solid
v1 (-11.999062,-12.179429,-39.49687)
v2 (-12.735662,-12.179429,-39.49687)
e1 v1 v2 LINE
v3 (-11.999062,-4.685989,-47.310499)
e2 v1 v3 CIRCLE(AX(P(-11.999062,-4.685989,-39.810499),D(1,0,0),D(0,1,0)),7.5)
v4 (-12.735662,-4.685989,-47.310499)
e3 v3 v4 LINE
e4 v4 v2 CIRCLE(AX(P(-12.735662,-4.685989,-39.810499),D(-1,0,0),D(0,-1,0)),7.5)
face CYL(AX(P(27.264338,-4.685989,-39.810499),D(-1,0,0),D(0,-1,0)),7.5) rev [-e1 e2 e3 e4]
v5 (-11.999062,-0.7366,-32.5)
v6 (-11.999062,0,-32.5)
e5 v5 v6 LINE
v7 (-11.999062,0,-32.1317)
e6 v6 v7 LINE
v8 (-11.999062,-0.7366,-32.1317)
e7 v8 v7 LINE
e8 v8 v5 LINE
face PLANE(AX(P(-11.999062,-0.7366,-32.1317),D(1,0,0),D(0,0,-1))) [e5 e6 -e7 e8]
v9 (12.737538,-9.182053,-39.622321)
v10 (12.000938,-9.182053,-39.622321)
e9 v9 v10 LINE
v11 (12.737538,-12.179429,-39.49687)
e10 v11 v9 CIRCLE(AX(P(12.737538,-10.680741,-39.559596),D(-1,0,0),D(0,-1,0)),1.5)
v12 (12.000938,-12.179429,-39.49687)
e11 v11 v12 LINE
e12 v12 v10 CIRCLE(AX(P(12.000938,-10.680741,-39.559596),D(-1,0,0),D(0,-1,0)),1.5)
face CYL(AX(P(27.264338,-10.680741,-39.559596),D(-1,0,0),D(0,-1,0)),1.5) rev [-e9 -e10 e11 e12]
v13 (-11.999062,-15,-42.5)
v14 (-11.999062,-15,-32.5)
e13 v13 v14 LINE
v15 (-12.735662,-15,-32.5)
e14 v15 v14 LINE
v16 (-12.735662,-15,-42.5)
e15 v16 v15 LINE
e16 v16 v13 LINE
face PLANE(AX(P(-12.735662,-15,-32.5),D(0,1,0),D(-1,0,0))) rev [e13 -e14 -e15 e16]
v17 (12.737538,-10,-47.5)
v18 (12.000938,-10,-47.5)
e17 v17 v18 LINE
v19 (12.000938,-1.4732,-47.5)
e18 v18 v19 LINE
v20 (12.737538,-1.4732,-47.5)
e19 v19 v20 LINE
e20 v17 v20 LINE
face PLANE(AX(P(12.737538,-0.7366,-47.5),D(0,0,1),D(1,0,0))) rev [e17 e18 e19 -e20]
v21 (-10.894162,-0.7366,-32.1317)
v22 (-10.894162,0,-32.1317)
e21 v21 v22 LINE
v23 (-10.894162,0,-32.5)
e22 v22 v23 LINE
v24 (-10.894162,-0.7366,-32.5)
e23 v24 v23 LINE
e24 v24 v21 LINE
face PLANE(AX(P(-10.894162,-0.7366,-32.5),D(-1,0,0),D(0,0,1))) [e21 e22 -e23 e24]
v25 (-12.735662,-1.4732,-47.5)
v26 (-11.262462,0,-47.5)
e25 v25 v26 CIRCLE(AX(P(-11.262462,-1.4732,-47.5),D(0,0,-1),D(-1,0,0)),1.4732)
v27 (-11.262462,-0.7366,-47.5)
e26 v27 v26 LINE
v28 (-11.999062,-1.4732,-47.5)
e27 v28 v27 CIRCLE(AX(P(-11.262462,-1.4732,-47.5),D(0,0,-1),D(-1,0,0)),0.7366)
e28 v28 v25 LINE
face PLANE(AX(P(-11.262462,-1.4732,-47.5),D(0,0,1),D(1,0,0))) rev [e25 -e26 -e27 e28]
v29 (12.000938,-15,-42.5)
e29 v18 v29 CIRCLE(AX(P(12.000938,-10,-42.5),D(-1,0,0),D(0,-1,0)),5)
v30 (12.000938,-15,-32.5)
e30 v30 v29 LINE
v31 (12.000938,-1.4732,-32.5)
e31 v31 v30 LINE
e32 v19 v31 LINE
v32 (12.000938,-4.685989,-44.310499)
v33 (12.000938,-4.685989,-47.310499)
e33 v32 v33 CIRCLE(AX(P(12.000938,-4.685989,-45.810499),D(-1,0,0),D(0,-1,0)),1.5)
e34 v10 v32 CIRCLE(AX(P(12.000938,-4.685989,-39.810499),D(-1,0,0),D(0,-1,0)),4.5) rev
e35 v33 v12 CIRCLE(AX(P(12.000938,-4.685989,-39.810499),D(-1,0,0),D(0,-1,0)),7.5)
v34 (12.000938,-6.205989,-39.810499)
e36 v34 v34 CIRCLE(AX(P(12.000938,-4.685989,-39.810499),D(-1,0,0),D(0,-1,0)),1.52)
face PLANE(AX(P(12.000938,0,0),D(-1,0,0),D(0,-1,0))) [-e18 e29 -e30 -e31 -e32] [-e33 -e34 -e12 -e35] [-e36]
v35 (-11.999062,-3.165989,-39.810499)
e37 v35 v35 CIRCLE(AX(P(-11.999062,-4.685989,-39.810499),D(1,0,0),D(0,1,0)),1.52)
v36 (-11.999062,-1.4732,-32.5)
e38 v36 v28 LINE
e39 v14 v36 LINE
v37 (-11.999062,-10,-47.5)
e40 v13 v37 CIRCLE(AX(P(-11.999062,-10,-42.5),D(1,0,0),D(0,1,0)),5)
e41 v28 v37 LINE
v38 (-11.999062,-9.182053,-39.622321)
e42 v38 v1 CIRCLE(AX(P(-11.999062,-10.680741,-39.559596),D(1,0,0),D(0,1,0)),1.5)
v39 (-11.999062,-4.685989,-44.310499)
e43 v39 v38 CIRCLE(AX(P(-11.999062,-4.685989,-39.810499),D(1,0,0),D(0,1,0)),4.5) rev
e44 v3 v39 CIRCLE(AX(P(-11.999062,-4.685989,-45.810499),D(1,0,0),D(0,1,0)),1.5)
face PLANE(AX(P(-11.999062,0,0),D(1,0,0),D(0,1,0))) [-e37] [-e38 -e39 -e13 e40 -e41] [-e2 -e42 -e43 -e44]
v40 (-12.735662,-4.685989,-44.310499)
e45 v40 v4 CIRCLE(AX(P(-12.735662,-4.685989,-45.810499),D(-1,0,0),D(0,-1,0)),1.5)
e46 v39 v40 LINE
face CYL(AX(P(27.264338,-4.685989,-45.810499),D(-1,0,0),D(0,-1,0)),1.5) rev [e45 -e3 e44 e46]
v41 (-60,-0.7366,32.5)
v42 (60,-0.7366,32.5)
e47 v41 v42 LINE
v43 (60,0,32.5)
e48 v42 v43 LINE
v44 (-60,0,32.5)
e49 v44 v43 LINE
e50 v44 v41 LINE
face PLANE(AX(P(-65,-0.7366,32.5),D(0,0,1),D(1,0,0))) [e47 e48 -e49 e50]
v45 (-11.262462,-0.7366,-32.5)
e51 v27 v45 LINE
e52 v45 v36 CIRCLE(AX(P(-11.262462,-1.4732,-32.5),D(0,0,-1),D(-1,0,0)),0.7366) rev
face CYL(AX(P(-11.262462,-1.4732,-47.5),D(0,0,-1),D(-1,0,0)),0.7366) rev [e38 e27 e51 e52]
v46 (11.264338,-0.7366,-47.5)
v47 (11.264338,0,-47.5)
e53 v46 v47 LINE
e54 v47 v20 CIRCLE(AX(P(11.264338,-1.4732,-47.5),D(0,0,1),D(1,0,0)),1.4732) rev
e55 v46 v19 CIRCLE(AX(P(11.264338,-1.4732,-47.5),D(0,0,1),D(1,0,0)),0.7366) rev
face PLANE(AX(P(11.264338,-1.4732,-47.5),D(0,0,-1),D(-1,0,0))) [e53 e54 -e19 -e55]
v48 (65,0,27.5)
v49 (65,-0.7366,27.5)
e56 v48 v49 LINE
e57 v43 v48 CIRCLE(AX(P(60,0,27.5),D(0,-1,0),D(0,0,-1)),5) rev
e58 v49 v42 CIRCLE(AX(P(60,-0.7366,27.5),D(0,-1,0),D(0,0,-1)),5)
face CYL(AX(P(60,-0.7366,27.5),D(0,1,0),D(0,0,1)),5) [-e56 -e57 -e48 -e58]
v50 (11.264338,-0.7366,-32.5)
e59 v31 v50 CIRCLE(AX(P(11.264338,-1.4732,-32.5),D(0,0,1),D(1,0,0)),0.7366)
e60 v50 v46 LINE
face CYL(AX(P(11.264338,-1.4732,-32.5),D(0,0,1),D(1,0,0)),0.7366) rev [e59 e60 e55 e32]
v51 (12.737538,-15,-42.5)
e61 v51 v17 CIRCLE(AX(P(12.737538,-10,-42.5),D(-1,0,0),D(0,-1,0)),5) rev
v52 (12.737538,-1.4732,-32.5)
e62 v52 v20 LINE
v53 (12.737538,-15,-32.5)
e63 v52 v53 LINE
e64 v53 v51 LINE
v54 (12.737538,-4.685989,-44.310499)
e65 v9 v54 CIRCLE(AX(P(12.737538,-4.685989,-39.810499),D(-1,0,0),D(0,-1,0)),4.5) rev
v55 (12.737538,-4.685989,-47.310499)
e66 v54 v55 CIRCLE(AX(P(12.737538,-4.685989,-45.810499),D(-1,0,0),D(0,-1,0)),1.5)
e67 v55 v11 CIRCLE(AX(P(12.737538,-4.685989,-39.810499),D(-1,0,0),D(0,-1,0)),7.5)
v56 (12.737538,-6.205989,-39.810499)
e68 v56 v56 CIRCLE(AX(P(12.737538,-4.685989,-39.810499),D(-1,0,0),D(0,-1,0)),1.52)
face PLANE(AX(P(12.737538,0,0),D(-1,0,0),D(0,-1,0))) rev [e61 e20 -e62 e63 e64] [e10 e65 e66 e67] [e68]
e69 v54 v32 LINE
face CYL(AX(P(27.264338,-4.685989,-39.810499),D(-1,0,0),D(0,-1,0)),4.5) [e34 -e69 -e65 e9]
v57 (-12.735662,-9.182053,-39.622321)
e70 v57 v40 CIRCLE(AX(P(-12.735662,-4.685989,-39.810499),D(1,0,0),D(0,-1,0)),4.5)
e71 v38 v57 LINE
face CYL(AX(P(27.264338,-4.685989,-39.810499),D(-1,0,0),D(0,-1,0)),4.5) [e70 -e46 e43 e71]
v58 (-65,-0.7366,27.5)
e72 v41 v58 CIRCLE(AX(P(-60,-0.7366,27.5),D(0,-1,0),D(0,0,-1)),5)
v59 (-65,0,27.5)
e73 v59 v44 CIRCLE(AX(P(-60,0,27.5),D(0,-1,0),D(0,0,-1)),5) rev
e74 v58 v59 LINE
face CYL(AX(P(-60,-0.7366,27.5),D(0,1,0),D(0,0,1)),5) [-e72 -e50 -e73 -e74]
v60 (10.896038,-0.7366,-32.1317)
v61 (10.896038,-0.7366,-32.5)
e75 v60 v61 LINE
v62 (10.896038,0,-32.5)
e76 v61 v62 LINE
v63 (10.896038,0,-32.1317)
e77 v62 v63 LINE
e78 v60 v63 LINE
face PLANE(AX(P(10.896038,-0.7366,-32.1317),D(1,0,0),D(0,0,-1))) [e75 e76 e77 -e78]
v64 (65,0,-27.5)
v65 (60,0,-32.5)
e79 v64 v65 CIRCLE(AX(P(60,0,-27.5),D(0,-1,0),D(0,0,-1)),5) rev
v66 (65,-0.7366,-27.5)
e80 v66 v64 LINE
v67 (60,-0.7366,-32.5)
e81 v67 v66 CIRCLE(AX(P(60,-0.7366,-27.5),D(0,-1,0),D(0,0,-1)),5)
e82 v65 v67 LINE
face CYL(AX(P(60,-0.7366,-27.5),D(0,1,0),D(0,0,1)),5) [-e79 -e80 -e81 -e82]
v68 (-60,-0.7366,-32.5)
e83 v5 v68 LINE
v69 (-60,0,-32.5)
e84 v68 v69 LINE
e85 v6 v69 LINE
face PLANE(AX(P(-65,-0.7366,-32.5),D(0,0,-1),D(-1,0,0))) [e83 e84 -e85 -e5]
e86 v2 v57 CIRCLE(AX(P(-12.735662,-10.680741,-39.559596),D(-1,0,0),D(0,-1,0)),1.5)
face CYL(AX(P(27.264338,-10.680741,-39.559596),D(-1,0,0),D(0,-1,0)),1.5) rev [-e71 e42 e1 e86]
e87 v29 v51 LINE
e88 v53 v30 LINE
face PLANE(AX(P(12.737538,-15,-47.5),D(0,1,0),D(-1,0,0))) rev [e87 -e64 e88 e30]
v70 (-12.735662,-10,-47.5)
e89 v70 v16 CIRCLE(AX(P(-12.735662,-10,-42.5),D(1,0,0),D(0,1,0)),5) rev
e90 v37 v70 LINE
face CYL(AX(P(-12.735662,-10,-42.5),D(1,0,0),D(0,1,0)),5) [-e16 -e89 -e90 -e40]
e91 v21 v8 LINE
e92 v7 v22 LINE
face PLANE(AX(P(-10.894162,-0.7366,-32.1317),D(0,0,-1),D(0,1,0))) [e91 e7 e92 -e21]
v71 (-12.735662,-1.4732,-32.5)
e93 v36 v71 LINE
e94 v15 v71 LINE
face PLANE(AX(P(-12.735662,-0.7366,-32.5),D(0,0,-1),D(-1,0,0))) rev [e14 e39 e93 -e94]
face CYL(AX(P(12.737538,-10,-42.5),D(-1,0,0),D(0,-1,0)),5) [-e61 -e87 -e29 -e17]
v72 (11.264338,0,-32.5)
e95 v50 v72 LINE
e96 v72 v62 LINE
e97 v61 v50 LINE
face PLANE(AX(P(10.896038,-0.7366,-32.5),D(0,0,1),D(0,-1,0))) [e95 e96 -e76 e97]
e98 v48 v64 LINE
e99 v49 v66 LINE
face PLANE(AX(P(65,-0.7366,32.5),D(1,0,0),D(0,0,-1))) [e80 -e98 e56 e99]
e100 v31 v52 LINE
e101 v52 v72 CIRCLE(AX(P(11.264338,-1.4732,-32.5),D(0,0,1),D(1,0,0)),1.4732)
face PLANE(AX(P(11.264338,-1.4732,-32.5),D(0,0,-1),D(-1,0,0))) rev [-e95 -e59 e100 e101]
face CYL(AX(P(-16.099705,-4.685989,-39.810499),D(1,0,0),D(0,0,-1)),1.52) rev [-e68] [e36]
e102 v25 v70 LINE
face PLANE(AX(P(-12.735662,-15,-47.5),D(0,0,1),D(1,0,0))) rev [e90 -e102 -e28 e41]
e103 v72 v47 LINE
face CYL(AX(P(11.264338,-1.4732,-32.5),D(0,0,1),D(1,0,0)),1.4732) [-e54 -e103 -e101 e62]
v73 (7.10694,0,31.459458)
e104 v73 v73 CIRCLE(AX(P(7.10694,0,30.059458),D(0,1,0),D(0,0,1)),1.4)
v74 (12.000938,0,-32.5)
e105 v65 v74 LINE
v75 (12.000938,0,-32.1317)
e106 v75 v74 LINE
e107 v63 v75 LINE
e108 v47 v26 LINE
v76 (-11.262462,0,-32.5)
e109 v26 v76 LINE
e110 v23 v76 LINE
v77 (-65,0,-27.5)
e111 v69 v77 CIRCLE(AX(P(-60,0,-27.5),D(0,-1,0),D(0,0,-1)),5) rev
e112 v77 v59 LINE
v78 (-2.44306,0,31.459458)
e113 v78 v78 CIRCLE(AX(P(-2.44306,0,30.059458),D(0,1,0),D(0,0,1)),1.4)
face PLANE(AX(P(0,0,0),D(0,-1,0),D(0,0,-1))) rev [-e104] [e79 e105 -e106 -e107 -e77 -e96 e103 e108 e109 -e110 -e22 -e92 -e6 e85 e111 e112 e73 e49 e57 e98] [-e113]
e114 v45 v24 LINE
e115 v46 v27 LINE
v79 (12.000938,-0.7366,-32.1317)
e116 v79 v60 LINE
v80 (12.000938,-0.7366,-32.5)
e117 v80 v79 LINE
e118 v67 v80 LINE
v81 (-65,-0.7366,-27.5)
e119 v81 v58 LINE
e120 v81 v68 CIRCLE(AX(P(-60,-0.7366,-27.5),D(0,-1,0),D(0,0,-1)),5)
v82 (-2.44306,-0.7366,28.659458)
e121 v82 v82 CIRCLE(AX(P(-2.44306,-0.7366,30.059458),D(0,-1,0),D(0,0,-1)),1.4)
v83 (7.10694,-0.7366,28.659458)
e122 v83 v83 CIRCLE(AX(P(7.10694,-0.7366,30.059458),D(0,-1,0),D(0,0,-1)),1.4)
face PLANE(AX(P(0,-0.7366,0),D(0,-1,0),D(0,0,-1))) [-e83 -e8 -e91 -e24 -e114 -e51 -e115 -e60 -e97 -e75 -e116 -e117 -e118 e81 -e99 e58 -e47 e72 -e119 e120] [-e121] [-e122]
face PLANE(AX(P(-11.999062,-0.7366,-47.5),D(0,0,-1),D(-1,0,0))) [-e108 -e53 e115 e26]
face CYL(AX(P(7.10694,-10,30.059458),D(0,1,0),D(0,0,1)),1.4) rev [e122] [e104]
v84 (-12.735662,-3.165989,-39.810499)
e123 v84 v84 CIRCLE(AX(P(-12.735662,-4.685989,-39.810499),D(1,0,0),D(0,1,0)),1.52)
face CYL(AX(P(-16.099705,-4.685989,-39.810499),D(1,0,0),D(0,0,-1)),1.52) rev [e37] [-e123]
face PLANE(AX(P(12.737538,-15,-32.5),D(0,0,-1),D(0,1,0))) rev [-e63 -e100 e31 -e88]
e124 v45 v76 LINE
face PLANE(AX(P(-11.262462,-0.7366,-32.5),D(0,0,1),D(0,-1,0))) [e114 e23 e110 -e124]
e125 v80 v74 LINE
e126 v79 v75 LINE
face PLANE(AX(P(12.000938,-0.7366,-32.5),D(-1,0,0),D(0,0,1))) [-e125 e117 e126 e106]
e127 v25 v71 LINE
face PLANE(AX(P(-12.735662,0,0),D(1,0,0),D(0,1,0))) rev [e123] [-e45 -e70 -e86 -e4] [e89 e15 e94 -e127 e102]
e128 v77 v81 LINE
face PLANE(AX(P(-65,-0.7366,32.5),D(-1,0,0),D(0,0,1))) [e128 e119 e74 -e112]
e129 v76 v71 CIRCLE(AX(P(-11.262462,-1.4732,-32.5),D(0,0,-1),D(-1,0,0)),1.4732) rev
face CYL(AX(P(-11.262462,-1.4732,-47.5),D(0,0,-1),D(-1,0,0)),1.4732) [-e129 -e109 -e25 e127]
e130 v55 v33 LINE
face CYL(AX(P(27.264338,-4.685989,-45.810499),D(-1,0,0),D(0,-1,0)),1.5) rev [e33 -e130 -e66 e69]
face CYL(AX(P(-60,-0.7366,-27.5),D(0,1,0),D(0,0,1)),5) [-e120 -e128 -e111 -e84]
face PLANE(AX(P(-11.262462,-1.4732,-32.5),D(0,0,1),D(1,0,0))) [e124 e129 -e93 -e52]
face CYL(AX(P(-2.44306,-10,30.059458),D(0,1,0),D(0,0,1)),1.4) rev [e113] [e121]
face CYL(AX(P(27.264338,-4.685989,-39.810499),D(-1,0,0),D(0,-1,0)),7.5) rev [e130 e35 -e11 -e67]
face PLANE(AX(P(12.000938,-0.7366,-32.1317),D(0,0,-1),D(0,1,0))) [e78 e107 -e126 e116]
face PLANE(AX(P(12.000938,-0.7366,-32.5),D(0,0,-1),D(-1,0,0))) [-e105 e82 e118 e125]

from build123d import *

# Parameters (mm, degrees)
BASE_FLANGE1_DEPTH   = 0.7366
FILLET1_R            = 5
FILLET2_R            = 5
FILLET3_R            = 5
FILLET4_R            = 5
EDGE_FLANGE2_START   = -47.5
EDGE_FLANGE2_DEPTH   = 15.3683
EDGE_FLANGE2_START_2 = -32.5
EDGE_FLANGE2_2_DEPTH = 0.3683
EDGE_FLANGE2_3_DEPTH = 15
FILLET7_R            = 5
FILLET8_R            = 5
SKETCH18_R           = 1.5
CUT_EXTRUDE1_DEPTH   = 40
SKETCH23_R           = 1.52
CUT_EXTRUDE6_DEPTH   = 30
SKETCH25_R           = 1.4
CUT_EXTRUDE8_DEPTH   = 10


with BuildPart() as part:
    # Base-Flange1: sheet metal written as solids
    # Sketch1 → Base-Flange1 (new body)
    with BuildSketch(Plane(origin=(0, 0, 0), x_dir=(1, 0, 0), z_dir=(0, 1, 0))):
        Polygon((19.610938441, 32.5), (65, 32.5), (65, -32.5), (-65, -32.5), (-65, 32.5), (-19.610938441, 32.5), (-11.999061559, 32.5), (-11.999061559, 47.5), (12.000938441, 47.5), (12.000938441, 32.5), align=None)
    extrude(amount=-BASE_FLANGE1_DEPTH)

    # Fillet1
    fillet1_edges = [part.edges().sort_by_distance(p)[0] for p in [
        (65, -0.3683, 32.5),
    ]]
    fillet(fillet1_edges, radius=FILLET1_R)

    # Fillet2
    fillet2_edges = [part.edges().sort_by_distance(p)[0] for p in [
        (65, -0.3683, -32.5),
    ]]
    fillet(fillet2_edges, radius=FILLET2_R)

    # Fillet3
    fillet3_edges = [part.edges().sort_by_distance(p)[0] for p in [
        (-65, -0.3683, 32.5),
    ]]
    fillet(fillet3_edges, radius=FILLET3_R)

    # Fillet4
    fillet4_edges = [part.edges().sort_by_distance(p)[0] for p in [
        (-65, -0.3683, -32.5),
    ]]
    fillet(fillet4_edges, radius=FILLET4_R)

    # Edge-Flange2: read off the stored shape, not the designer's step
    # Edge-Flange2 outline → Edge-Flange2 (cut)
    with BuildSketch(Plane.XY.offset(EDGE_FLANGE2_START)):
        with BuildLine():
            ThreePointArc((-11.999061559, -0.197371375), (-11.643753776, -0.050198073), (-11.262461559, 0))
            Line((-11.262461559, 0), (-11.999061559, 0))
            Line((-11.999061559, 0), (-11.999061559, -0.197371375))
        make_face()
        with BuildLine():
            ThreePointArc((11.264338441, 0), (11.645630659, -0.050198073), (12.000938441, -0.197371375))
            Line((12.000938441, -0.197371375), (12.000938441, 0))
            Line((12.000938441, 0), (11.264338441, 0))
        make_face()
    extrude(amount=EDGE_FLANGE2_DEPTH, mode=Mode.SUBTRACT)

    # Edge-Flange2 2 outline → Edge-Flange2 2 (cut)
    with BuildSketch(Plane.XY.offset(EDGE_FLANGE2_START_2)):
        with BuildLine():
            Line((-11.999061559, -0.7366), (-10.894161559, -0.7366))
            Line((-10.894161559, -0.7366), (-10.894161559, 0))
            Line((-10.894161559, 0), (-11.262461559, 0))
            ThreePointArc((-11.262461559, 0), (-11.643753776, -0.050198073), (-11.999061559, -0.197371375))
            Line((-11.999061559, -0.197371375), (-11.999061559, -0.7366))
        make_face()
        with BuildLine():
            Line((12.000938441, -0.7366), (12.000938441, -0.197371375))
            ThreePointArc((12.000938441, -0.197371375), (11.645630659, -0.050198073), (11.264338441, 0))
            Line((11.264338441, 0), (10.896038441, 0))
            Line((10.896038441, 0), (10.896038441, -0.7366))
            Line((10.896038441, -0.7366), (12.000938441, -0.7366))
        make_face()
    extrude(amount=EDGE_FLANGE2_2_DEPTH, mode=Mode.SUBTRACT)

    # Edge-Flange2 3 outline → Edge-Flange2 3 (add)
    with BuildSketch(Plane.XY.offset(EDGE_FLANGE2_START)):
        with BuildLine():
            ThreePointArc((-11.999061559, -1.4732), (-11.783316414, -0.952345145), (-11.262461559, -0.7366))
            Line((-11.262461559, -0.7366), (-11.999061559, -0.7366))
            Line((-11.999061559, -0.7366), (-11.999061559, -0.197371375))
            ThreePointArc((-11.999061559, -0.197371375), (-12.538290183, -0.7366), (-12.735661559, -1.4732))
            Line((-12.735661559, -1.4732), (-12.735661559, -15))
            Line((-12.735661559, -15), (-11.999061559, -15))
            Line((-11.999061559, -15), (-11.999061559, -1.4732))
        make_face()
        with BuildLine():
            Line((12.737538441, -15), (12.737538441, -1.4732))
            ThreePointArc((12.737538441, -1.4732), (12.540167066, -0.7366), (12.000938441, -0.197371375))
            Line((12.000938441, -0.197371375), (12.000938441, -0.7366))
            Line((12.000938441, -0.7366), (11.264338441, -0.7366))
            ThreePointArc((11.264338441, -0.7366), (11.785193296, -0.952345145), (12.000938441, -1.4732))
            Line((12.000938441, -1.4732), (12.000938441, -15))
            Line((12.000938441, -15), (12.737538441, -15))
        make_face()
    extrude(amount=EDGE_FLANGE2_3_DEPTH)

    # Fillet7
    fillet7_edges = [part.edges().sort_by_distance(p)[0] for p in [
        (12.369238441, -15, -47.5),
    ]]
    fillet(fillet7_edges, radius=FILLET7_R)

    # Fillet8
    fillet8_edges = [part.edges().sort_by_distance(p)[0] for p in [
        (-12.367361559, -15, -47.5),
    ]]
    fillet(fillet8_edges, radius=FILLET8_R)

    # Sketch18 → Cut-Extrude1 (cut)
    with BuildSketch(Plane.ZY.offset(12.735661559)):
        with Locations(Location((-39.810498868, -4.68598948, 0), (0, 0, 270))):
            Circle(SKETCH18_R)
        with BuildLine():
            ThreePointArc((-39.496869826, -12.179429066), (-38.060907717, -10.61801534), (-39.622321443, -9.182053232))
            ThreePointArc((-39.622321443, -9.182053232), (-42.925238149, -7.933819403), (-44.310498868, -4.68598948))
            ThreePointArc((-44.310498868, -4.68598948), (-45.810498868, -3.18598948), (-47.310498868, -4.68598948))
            ThreePointArc((-47.310498868, -4.68598948), (-45.001731004, -10.099039351), (-39.496869826, -12.179429066))
        make_face()
    extrude(amount=-CUT_EXTRUDE1_DEPTH, mode=Mode.SUBTRACT)

    # Sketch23 → Cut-Extrude6 (cut)
    with BuildSketch(Plane(origin=(13.900294902, -27.805223525, -244.007014279), x_dir=(-3.6601011800335994e-15, 0.31934249234828205, -0.9476393684207024), z_dir=(1, 0, 0))):
        with Locations(Location((-186.121703077, 87.117320509, 0), (0, 0, 251.376833723))):
            Circle(SKETCH23_R)
    extrude(amount=-CUT_EXTRUDE6_DEPTH, mode=Mode.SUBTRACT)

    # Sketch25 → Cut-Extrude8 (cut)
    with BuildSketch(Plane(origin=(-71.983966672, 0, -96.098250098), x_dir=(1, 0, 0), z_dir=(0, 1, 0))):
        with Locations(Location((79.090906604, -126.157708005, 0), (0, 0, 270))):
            Circle(SKETCH25_R)
        with Locations(Location((69.540906604, -126.157708005, 0), (0, 0, 270))):
            Circle(SKETCH25_R)
    extrude(amount=-CUT_EXTRUDE8_DEPTH, mode=Mode.SUBTRACT)


solid = part.part
